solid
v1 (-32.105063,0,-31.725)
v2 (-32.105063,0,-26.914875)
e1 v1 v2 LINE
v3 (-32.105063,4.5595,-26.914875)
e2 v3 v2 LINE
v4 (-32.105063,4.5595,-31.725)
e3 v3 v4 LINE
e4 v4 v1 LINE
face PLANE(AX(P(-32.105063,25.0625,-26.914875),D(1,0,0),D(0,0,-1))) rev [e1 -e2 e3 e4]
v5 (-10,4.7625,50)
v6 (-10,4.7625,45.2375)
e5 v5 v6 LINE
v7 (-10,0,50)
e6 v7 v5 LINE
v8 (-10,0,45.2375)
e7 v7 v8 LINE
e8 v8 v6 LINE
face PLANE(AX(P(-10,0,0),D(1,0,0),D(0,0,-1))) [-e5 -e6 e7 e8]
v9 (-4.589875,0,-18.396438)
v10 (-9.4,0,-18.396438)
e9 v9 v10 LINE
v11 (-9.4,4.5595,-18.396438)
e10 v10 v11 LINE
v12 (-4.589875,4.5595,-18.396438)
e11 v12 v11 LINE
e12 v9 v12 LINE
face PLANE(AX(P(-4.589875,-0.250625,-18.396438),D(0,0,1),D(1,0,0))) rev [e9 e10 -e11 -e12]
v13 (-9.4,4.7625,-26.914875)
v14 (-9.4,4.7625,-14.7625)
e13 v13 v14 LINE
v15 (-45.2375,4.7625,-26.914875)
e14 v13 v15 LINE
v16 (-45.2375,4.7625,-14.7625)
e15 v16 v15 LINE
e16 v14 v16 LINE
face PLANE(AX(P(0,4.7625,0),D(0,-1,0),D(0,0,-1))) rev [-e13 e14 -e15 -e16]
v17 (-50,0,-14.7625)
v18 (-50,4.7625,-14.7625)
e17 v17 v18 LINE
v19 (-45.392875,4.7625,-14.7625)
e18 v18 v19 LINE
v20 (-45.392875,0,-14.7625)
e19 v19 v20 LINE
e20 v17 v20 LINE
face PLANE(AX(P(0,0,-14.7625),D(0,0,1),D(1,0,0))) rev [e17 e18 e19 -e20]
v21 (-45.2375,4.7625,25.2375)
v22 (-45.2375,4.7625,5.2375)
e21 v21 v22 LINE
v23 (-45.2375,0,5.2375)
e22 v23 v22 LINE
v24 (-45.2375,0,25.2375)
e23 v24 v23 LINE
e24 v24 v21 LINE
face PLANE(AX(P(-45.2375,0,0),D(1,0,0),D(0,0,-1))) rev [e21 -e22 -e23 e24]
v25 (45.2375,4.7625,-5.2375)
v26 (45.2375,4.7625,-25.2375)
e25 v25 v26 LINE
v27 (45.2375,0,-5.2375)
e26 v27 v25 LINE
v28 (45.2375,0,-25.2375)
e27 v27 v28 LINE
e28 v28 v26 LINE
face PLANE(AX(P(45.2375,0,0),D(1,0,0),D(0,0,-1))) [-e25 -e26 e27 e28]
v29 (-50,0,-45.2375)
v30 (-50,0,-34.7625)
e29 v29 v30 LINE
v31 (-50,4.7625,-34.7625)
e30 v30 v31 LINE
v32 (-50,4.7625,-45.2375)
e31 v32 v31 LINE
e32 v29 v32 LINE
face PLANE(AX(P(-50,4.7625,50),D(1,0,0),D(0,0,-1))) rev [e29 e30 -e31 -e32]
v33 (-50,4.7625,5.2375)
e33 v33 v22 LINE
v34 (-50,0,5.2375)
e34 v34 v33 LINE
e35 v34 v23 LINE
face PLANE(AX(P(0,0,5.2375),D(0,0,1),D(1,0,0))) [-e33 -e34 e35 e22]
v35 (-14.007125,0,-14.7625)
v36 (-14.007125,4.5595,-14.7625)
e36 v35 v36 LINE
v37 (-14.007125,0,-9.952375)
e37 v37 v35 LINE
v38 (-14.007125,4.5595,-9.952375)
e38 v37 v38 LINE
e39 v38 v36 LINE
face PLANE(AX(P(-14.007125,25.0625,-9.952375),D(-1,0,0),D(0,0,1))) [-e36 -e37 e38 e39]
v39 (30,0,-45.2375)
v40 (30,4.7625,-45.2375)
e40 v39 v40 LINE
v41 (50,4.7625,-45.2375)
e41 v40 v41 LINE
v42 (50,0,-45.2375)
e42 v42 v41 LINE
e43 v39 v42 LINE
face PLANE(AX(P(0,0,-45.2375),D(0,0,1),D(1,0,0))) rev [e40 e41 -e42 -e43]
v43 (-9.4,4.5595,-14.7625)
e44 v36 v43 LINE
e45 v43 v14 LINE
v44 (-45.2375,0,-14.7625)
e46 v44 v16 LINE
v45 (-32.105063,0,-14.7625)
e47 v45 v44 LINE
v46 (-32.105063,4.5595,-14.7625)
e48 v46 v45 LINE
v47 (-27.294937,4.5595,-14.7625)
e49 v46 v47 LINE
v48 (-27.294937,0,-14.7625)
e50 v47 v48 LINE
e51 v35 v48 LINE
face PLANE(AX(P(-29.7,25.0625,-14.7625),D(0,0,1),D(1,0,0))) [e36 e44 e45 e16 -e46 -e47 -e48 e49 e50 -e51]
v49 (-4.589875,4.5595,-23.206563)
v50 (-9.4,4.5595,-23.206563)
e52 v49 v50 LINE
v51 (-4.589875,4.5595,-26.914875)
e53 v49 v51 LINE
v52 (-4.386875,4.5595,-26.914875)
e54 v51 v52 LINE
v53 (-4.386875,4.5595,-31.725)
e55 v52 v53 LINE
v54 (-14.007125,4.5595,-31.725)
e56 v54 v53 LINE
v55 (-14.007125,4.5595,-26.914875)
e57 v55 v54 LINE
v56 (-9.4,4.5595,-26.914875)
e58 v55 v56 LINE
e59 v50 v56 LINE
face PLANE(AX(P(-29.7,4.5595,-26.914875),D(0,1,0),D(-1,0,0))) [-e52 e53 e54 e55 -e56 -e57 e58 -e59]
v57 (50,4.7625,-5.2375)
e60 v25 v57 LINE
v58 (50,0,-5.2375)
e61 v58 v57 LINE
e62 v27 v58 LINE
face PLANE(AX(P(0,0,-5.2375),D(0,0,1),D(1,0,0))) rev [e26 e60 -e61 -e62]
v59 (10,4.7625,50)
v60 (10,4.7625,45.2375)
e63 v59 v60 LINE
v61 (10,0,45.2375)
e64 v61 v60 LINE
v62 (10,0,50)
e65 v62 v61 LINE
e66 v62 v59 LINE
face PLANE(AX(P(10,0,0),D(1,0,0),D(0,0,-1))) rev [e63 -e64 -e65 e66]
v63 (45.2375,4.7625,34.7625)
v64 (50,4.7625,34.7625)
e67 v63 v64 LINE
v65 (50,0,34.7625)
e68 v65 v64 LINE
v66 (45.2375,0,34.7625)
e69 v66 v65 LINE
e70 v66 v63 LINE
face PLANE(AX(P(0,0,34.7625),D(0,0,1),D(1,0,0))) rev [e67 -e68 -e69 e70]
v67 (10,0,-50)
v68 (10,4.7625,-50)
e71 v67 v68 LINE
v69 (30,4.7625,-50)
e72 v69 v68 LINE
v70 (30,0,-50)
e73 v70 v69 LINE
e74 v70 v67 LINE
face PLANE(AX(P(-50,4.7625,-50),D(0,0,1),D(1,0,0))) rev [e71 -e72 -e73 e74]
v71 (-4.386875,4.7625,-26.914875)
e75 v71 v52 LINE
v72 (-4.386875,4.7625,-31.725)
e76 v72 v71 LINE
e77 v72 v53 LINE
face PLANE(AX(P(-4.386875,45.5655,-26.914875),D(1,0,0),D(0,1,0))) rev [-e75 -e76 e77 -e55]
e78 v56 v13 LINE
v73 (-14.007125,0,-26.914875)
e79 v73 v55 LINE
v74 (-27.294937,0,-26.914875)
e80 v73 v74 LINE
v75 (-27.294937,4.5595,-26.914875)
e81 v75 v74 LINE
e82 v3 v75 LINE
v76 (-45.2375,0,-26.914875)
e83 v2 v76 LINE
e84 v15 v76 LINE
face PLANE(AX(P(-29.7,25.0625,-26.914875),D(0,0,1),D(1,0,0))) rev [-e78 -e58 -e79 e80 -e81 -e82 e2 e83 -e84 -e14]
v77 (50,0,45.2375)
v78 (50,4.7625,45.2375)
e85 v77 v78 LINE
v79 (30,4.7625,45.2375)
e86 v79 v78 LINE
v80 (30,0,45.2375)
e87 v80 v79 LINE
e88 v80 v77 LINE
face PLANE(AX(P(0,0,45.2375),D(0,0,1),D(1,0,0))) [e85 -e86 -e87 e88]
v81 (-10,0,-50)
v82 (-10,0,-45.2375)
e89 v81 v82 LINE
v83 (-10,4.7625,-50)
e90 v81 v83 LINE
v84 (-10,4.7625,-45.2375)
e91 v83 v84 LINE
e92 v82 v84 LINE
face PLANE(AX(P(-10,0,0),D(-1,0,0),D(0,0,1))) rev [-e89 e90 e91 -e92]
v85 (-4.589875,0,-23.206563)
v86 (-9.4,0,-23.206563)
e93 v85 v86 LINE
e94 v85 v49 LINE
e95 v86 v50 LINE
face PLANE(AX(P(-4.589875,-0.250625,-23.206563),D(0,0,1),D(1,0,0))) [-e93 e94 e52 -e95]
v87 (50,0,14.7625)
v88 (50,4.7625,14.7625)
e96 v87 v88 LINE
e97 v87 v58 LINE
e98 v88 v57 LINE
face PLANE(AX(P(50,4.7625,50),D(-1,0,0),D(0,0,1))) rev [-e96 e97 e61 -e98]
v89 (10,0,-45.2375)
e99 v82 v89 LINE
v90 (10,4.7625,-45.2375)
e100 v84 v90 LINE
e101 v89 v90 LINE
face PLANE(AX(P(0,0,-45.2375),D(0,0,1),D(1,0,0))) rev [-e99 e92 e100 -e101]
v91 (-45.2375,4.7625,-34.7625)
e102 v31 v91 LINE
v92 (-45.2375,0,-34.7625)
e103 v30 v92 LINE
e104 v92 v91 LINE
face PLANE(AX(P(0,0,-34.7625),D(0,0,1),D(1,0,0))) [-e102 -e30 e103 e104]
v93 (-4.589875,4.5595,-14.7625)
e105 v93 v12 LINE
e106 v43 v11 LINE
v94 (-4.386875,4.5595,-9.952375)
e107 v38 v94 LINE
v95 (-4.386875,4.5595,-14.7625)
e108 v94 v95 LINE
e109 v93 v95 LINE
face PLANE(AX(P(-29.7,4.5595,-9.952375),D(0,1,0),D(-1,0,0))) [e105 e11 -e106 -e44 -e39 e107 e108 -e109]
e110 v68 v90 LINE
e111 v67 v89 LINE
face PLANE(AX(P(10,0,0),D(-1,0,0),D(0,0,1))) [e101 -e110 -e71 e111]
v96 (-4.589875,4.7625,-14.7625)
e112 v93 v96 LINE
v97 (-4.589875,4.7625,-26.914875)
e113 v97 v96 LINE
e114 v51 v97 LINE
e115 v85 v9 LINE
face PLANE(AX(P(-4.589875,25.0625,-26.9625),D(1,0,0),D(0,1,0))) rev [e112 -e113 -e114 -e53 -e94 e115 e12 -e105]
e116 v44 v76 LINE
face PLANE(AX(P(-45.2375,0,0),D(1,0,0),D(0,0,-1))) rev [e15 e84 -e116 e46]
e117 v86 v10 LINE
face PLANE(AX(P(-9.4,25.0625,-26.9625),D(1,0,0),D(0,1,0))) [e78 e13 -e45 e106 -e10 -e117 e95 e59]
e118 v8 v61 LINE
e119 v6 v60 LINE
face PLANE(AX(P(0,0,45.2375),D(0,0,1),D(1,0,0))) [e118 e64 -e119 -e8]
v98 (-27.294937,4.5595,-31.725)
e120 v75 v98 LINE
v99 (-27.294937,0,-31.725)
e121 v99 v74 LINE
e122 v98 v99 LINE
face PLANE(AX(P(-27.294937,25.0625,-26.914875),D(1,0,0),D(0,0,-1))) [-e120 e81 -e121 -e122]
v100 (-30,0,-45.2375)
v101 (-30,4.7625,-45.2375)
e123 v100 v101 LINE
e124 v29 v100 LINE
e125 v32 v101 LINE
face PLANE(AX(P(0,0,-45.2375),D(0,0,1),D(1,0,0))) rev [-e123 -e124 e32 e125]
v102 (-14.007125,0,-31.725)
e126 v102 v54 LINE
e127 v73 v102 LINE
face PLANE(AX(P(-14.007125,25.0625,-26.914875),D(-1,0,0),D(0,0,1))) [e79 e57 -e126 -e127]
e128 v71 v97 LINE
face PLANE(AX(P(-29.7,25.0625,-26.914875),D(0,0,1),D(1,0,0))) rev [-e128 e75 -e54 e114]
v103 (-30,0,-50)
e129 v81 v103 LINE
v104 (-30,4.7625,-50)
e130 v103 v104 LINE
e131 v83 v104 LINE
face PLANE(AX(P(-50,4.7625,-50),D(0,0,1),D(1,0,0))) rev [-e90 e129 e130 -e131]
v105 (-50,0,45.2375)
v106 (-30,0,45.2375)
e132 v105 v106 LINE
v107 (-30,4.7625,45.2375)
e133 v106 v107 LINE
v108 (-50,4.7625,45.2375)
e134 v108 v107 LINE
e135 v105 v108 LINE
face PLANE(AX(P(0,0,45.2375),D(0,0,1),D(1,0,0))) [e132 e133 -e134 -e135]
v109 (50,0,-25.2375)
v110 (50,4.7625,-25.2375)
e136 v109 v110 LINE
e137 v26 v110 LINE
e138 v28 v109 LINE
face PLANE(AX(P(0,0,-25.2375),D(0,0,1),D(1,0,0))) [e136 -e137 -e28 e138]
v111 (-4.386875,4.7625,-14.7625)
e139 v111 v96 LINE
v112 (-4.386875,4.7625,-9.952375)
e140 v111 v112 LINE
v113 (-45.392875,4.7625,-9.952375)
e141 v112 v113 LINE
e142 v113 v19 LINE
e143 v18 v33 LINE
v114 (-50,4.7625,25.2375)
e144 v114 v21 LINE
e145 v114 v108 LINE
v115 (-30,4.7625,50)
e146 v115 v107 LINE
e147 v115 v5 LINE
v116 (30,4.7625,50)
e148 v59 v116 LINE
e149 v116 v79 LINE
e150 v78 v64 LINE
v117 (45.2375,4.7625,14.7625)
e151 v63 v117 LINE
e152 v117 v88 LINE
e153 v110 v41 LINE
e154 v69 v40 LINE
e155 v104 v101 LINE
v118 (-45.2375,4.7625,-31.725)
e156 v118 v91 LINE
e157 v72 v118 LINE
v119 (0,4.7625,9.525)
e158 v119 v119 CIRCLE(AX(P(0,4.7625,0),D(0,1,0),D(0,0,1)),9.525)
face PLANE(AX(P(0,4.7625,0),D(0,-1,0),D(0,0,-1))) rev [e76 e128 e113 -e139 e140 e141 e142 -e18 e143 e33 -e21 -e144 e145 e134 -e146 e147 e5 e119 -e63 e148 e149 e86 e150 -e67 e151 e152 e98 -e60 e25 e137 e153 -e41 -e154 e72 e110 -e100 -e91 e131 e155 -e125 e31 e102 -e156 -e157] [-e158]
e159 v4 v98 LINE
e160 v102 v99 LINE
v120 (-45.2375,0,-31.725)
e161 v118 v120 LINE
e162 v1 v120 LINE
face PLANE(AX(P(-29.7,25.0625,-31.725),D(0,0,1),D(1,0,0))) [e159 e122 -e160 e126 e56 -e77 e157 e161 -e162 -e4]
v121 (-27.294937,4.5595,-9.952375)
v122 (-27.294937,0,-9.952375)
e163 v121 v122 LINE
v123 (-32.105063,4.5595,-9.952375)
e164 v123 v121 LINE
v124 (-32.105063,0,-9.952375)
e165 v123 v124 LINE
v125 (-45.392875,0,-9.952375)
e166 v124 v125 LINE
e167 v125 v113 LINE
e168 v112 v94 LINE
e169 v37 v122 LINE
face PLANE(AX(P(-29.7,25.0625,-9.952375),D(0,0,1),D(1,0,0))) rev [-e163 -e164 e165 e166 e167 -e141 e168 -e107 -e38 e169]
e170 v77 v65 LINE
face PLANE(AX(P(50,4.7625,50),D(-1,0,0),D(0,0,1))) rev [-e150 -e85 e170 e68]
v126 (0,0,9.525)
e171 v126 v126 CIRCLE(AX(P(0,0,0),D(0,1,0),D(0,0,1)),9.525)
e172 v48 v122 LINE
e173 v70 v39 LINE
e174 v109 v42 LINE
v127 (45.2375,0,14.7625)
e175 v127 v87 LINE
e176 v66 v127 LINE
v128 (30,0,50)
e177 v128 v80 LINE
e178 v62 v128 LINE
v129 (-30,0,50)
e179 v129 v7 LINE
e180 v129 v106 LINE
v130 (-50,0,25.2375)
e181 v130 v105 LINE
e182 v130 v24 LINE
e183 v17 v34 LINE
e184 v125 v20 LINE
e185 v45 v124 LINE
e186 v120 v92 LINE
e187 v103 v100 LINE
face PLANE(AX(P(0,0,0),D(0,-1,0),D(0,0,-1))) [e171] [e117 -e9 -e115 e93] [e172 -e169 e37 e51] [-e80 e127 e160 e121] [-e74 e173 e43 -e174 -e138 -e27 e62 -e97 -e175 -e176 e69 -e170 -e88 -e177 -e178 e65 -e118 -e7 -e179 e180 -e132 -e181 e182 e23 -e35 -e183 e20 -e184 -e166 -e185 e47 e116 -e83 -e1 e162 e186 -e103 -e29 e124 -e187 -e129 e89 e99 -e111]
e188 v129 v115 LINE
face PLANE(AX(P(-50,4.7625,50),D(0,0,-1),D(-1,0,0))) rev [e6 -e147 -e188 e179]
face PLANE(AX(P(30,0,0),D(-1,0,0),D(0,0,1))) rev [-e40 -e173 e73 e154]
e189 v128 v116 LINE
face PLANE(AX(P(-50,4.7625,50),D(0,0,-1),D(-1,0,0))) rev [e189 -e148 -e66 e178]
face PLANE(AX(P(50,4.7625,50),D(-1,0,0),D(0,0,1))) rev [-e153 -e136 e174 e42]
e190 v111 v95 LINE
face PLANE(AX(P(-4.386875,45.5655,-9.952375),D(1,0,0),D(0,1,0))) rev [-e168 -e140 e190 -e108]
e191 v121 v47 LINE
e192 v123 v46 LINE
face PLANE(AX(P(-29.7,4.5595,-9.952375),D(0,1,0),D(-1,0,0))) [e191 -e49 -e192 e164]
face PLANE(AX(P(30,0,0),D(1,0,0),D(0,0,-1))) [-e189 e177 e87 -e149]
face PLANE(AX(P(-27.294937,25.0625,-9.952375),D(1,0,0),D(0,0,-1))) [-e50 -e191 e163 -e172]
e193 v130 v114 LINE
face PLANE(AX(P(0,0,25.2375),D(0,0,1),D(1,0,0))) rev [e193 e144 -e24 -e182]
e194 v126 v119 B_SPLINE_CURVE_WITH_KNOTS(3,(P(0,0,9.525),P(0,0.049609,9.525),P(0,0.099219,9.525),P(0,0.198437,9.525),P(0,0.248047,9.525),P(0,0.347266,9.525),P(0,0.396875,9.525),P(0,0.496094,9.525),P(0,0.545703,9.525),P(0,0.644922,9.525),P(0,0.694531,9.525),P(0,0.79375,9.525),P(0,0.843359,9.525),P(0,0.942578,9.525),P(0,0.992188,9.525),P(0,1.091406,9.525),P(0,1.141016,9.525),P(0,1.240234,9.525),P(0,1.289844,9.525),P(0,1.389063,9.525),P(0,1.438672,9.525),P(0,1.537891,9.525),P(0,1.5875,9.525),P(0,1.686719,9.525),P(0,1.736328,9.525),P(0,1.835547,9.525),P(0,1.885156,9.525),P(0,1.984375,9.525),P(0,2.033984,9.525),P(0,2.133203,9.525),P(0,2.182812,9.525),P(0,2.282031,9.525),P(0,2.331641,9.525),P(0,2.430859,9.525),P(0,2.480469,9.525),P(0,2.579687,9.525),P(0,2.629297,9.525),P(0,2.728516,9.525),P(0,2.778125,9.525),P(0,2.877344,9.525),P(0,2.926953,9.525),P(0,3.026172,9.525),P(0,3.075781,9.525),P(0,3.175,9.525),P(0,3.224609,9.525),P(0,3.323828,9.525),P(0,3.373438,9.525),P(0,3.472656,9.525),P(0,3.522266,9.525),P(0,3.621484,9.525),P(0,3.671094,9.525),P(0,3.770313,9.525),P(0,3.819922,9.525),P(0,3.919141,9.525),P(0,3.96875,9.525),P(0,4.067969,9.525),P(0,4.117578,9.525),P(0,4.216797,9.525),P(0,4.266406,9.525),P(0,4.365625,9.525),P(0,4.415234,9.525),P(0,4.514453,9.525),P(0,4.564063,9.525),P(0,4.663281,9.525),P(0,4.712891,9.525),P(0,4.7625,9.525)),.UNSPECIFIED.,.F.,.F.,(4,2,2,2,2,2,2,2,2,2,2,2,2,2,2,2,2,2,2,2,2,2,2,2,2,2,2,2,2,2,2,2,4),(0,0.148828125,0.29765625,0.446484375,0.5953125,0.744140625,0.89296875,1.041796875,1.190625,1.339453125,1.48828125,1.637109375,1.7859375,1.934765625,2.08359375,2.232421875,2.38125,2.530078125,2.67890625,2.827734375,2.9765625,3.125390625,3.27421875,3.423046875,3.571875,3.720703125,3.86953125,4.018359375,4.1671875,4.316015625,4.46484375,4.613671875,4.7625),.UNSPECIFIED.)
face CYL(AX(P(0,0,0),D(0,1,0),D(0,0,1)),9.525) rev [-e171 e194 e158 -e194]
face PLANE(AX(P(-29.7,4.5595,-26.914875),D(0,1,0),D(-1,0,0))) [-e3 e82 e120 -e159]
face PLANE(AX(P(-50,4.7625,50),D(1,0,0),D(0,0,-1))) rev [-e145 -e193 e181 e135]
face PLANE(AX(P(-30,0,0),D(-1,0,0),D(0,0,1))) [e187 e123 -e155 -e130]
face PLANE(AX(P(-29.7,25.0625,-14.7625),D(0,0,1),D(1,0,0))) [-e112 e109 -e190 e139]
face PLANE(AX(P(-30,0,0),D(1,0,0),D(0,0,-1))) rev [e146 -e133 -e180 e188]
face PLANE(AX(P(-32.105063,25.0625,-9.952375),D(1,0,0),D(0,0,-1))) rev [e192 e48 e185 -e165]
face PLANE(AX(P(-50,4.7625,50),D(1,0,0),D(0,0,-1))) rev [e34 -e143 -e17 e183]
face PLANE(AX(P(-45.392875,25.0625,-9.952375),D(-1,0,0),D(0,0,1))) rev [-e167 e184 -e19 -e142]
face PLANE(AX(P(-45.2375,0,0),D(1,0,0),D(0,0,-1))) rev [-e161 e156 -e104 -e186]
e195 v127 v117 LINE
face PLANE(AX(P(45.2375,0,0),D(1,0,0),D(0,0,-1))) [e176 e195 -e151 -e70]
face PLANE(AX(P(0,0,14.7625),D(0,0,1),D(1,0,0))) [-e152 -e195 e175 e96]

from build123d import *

# Parameters (mm, degrees)
SKETCH1_W           = 100
SKETCH1_H           = 100
BOSS_EXTRUDE1_DEPTH = 4.7625
SKETCH2_W           = 20
SKETCH2_H           = 4.7625
SKETCH2_W_2         = 4.7625
SKETCH2_H_2         = 20
CUT_EXTRUDE1_DEPTH  = 4.7625
SKETCH3_R           = 9.525
CUT_EXTRUDE2_DEPTH  = 71.870878407
CAVITY2_START       = -14.7625
CAVITY2_DEPTH       = 4.810125
CAVITY2_START_2     = -31.725
CAVITY2_2_DEPTH     = 4.810125
CAVITY2_START_3     = -23.2065625
CAVITY2_3_OUTLINE_W = 4.810125
CAVITY2_3_OUTLINE_H = 4.7625
CAVITY2_3_DEPTH     = 4.810125
CAVITY2_START_4     = -26.914875
CAVITY2_4_OUTLINE_W = 4.810125
CAVITY2_4_OUTLINE_H = 0.203
CAVITY2_4_DEPTH     = 12.152375


# Read off the part's stored shape, not the designer's step: Cavity2
with BuildPart() as part:
    # Sketch1 → Boss-Extrude1 (new body)
    with BuildSketch(Plane(origin=(0, 0, 0), x_dir=(1, 0, 0), z_dir=(0, 1, 0))):
        Rectangle(SKETCH1_W, SKETCH1_H)
    extrude(amount=BOSS_EXTRUDE1_DEPTH)

    # Sketch2 → Cut-Extrude1 (cut)
    with BuildSketch(Plane(origin=(0, 4.7625, 0), x_dir=(1, 0, 0), z_dir=(0, 1, 0))):
        Polygon((-50, 45.2375), (-45.2375, 45.2375), (-30, 45.2375), (-30, 50), (-50, 50), align=None)
        with Locations((0, 47.61875)):
            Rectangle(SKETCH2_W, SKETCH2_H)
        Polygon((30, 50), (30, 45.2375), (45.2375, 45.2375), (50, 45.2375), (50, 50), align=None)
        with Locations((47.61875, 15.2375)):
            Rectangle(SKETCH2_W_2, SKETCH2_H_2)
        with Locations((47.61875, -24.7625)):
            Rectangle(SKETCH2_W_2, SKETCH2_H_2)
        Polygon((45.2375, -45.2375), (30, -45.2375), (30, -50), (50, -50), (50, -45.2375), align=None)
        with Locations((0, -47.61875)):
            Rectangle(SKETCH2_W, SKETCH2_H)
        Polygon((-30, -45.2375), (-45.2375, -45.2375), (-50, -45.2375), (-50, -50), (-30, -50), align=None)
        with Locations((-47.61875, -15.2375)):
            Rectangle(SKETCH2_W_2, SKETCH2_H_2)
        with Locations((-47.61875, 24.7625)):
            Rectangle(SKETCH2_W_2, SKETCH2_H_2)
    extrude(amount=-CUT_EXTRUDE1_DEPTH, mode=Mode.SUBTRACT)

    # Sketch3 → Cut-Extrude2 (cut, through all)
    with BuildSketch(Plane(origin=(0, 4.7625, 0), x_dir=(1, 0, 0), z_dir=(0, 1, 0))):
        with Locations(Location((0, 0, 0), (0, 0, 270))):
            Circle(SKETCH3_R)
    extrude(amount=-CUT_EXTRUDE2_DEPTH, mode=Mode.SUBTRACT)

    # Cavity2 outline → Cavity2 (cut)
    with BuildSketch(Plane.XY.offset(CAVITY2_START)):
        Polygon((-4.386875, 4.5595), (-4.386875, 4.7625), (-45.392875, 4.7625), (-45.392875, 0), (-32.1050625, 0), (-32.1050625, 4.5595), (-27.2949375, 4.5595), (-27.2949375, 0), (-14.007125, 0), (-14.007125, 4.5595), align=None)
    extrude(amount=CAVITY2_DEPTH, mode=Mode.SUBTRACT)

    # Cavity2 2 outline → Cavity2 2 (cut)
    with BuildSketch(Plane.XY.offset(CAVITY2_START_2)):
        Polygon((-4.386875, 4.5595), (-4.386875, 4.7625), (-45.2375, 4.7625), (-45.2375, 0), (-32.1050625, 0), (-32.1050625, 4.5595), (-27.2949375, 4.5595), (-27.2949375, 0), (-14.007125, 0), (-14.007125, 4.5595), align=None)
    extrude(amount=CAVITY2_2_DEPTH, mode=Mode.SUBTRACT)

    # Cavity2 3 outline → Cavity2 3 (cut)
    with BuildSketch(Plane.XY.offset(CAVITY2_START_3)):
        with Locations((-6.9949375, 2.38125)):
            Rectangle(CAVITY2_3_OUTLINE_W, CAVITY2_3_OUTLINE_H)
    extrude(amount=CAVITY2_3_DEPTH, mode=Mode.SUBTRACT)

    # Cavity2 4 outline → Cavity2 4 (cut)
    with BuildSketch(Plane.XY.offset(CAVITY2_START_4)):
        with Locations((-6.9949375, 4.661)):
            Rectangle(CAVITY2_4_OUTLINE_W, CAVITY2_4_OUTLINE_H)
    extrude(amount=CAVITY2_4_DEPTH, mode=Mode.SUBTRACT)


solid = part.part
